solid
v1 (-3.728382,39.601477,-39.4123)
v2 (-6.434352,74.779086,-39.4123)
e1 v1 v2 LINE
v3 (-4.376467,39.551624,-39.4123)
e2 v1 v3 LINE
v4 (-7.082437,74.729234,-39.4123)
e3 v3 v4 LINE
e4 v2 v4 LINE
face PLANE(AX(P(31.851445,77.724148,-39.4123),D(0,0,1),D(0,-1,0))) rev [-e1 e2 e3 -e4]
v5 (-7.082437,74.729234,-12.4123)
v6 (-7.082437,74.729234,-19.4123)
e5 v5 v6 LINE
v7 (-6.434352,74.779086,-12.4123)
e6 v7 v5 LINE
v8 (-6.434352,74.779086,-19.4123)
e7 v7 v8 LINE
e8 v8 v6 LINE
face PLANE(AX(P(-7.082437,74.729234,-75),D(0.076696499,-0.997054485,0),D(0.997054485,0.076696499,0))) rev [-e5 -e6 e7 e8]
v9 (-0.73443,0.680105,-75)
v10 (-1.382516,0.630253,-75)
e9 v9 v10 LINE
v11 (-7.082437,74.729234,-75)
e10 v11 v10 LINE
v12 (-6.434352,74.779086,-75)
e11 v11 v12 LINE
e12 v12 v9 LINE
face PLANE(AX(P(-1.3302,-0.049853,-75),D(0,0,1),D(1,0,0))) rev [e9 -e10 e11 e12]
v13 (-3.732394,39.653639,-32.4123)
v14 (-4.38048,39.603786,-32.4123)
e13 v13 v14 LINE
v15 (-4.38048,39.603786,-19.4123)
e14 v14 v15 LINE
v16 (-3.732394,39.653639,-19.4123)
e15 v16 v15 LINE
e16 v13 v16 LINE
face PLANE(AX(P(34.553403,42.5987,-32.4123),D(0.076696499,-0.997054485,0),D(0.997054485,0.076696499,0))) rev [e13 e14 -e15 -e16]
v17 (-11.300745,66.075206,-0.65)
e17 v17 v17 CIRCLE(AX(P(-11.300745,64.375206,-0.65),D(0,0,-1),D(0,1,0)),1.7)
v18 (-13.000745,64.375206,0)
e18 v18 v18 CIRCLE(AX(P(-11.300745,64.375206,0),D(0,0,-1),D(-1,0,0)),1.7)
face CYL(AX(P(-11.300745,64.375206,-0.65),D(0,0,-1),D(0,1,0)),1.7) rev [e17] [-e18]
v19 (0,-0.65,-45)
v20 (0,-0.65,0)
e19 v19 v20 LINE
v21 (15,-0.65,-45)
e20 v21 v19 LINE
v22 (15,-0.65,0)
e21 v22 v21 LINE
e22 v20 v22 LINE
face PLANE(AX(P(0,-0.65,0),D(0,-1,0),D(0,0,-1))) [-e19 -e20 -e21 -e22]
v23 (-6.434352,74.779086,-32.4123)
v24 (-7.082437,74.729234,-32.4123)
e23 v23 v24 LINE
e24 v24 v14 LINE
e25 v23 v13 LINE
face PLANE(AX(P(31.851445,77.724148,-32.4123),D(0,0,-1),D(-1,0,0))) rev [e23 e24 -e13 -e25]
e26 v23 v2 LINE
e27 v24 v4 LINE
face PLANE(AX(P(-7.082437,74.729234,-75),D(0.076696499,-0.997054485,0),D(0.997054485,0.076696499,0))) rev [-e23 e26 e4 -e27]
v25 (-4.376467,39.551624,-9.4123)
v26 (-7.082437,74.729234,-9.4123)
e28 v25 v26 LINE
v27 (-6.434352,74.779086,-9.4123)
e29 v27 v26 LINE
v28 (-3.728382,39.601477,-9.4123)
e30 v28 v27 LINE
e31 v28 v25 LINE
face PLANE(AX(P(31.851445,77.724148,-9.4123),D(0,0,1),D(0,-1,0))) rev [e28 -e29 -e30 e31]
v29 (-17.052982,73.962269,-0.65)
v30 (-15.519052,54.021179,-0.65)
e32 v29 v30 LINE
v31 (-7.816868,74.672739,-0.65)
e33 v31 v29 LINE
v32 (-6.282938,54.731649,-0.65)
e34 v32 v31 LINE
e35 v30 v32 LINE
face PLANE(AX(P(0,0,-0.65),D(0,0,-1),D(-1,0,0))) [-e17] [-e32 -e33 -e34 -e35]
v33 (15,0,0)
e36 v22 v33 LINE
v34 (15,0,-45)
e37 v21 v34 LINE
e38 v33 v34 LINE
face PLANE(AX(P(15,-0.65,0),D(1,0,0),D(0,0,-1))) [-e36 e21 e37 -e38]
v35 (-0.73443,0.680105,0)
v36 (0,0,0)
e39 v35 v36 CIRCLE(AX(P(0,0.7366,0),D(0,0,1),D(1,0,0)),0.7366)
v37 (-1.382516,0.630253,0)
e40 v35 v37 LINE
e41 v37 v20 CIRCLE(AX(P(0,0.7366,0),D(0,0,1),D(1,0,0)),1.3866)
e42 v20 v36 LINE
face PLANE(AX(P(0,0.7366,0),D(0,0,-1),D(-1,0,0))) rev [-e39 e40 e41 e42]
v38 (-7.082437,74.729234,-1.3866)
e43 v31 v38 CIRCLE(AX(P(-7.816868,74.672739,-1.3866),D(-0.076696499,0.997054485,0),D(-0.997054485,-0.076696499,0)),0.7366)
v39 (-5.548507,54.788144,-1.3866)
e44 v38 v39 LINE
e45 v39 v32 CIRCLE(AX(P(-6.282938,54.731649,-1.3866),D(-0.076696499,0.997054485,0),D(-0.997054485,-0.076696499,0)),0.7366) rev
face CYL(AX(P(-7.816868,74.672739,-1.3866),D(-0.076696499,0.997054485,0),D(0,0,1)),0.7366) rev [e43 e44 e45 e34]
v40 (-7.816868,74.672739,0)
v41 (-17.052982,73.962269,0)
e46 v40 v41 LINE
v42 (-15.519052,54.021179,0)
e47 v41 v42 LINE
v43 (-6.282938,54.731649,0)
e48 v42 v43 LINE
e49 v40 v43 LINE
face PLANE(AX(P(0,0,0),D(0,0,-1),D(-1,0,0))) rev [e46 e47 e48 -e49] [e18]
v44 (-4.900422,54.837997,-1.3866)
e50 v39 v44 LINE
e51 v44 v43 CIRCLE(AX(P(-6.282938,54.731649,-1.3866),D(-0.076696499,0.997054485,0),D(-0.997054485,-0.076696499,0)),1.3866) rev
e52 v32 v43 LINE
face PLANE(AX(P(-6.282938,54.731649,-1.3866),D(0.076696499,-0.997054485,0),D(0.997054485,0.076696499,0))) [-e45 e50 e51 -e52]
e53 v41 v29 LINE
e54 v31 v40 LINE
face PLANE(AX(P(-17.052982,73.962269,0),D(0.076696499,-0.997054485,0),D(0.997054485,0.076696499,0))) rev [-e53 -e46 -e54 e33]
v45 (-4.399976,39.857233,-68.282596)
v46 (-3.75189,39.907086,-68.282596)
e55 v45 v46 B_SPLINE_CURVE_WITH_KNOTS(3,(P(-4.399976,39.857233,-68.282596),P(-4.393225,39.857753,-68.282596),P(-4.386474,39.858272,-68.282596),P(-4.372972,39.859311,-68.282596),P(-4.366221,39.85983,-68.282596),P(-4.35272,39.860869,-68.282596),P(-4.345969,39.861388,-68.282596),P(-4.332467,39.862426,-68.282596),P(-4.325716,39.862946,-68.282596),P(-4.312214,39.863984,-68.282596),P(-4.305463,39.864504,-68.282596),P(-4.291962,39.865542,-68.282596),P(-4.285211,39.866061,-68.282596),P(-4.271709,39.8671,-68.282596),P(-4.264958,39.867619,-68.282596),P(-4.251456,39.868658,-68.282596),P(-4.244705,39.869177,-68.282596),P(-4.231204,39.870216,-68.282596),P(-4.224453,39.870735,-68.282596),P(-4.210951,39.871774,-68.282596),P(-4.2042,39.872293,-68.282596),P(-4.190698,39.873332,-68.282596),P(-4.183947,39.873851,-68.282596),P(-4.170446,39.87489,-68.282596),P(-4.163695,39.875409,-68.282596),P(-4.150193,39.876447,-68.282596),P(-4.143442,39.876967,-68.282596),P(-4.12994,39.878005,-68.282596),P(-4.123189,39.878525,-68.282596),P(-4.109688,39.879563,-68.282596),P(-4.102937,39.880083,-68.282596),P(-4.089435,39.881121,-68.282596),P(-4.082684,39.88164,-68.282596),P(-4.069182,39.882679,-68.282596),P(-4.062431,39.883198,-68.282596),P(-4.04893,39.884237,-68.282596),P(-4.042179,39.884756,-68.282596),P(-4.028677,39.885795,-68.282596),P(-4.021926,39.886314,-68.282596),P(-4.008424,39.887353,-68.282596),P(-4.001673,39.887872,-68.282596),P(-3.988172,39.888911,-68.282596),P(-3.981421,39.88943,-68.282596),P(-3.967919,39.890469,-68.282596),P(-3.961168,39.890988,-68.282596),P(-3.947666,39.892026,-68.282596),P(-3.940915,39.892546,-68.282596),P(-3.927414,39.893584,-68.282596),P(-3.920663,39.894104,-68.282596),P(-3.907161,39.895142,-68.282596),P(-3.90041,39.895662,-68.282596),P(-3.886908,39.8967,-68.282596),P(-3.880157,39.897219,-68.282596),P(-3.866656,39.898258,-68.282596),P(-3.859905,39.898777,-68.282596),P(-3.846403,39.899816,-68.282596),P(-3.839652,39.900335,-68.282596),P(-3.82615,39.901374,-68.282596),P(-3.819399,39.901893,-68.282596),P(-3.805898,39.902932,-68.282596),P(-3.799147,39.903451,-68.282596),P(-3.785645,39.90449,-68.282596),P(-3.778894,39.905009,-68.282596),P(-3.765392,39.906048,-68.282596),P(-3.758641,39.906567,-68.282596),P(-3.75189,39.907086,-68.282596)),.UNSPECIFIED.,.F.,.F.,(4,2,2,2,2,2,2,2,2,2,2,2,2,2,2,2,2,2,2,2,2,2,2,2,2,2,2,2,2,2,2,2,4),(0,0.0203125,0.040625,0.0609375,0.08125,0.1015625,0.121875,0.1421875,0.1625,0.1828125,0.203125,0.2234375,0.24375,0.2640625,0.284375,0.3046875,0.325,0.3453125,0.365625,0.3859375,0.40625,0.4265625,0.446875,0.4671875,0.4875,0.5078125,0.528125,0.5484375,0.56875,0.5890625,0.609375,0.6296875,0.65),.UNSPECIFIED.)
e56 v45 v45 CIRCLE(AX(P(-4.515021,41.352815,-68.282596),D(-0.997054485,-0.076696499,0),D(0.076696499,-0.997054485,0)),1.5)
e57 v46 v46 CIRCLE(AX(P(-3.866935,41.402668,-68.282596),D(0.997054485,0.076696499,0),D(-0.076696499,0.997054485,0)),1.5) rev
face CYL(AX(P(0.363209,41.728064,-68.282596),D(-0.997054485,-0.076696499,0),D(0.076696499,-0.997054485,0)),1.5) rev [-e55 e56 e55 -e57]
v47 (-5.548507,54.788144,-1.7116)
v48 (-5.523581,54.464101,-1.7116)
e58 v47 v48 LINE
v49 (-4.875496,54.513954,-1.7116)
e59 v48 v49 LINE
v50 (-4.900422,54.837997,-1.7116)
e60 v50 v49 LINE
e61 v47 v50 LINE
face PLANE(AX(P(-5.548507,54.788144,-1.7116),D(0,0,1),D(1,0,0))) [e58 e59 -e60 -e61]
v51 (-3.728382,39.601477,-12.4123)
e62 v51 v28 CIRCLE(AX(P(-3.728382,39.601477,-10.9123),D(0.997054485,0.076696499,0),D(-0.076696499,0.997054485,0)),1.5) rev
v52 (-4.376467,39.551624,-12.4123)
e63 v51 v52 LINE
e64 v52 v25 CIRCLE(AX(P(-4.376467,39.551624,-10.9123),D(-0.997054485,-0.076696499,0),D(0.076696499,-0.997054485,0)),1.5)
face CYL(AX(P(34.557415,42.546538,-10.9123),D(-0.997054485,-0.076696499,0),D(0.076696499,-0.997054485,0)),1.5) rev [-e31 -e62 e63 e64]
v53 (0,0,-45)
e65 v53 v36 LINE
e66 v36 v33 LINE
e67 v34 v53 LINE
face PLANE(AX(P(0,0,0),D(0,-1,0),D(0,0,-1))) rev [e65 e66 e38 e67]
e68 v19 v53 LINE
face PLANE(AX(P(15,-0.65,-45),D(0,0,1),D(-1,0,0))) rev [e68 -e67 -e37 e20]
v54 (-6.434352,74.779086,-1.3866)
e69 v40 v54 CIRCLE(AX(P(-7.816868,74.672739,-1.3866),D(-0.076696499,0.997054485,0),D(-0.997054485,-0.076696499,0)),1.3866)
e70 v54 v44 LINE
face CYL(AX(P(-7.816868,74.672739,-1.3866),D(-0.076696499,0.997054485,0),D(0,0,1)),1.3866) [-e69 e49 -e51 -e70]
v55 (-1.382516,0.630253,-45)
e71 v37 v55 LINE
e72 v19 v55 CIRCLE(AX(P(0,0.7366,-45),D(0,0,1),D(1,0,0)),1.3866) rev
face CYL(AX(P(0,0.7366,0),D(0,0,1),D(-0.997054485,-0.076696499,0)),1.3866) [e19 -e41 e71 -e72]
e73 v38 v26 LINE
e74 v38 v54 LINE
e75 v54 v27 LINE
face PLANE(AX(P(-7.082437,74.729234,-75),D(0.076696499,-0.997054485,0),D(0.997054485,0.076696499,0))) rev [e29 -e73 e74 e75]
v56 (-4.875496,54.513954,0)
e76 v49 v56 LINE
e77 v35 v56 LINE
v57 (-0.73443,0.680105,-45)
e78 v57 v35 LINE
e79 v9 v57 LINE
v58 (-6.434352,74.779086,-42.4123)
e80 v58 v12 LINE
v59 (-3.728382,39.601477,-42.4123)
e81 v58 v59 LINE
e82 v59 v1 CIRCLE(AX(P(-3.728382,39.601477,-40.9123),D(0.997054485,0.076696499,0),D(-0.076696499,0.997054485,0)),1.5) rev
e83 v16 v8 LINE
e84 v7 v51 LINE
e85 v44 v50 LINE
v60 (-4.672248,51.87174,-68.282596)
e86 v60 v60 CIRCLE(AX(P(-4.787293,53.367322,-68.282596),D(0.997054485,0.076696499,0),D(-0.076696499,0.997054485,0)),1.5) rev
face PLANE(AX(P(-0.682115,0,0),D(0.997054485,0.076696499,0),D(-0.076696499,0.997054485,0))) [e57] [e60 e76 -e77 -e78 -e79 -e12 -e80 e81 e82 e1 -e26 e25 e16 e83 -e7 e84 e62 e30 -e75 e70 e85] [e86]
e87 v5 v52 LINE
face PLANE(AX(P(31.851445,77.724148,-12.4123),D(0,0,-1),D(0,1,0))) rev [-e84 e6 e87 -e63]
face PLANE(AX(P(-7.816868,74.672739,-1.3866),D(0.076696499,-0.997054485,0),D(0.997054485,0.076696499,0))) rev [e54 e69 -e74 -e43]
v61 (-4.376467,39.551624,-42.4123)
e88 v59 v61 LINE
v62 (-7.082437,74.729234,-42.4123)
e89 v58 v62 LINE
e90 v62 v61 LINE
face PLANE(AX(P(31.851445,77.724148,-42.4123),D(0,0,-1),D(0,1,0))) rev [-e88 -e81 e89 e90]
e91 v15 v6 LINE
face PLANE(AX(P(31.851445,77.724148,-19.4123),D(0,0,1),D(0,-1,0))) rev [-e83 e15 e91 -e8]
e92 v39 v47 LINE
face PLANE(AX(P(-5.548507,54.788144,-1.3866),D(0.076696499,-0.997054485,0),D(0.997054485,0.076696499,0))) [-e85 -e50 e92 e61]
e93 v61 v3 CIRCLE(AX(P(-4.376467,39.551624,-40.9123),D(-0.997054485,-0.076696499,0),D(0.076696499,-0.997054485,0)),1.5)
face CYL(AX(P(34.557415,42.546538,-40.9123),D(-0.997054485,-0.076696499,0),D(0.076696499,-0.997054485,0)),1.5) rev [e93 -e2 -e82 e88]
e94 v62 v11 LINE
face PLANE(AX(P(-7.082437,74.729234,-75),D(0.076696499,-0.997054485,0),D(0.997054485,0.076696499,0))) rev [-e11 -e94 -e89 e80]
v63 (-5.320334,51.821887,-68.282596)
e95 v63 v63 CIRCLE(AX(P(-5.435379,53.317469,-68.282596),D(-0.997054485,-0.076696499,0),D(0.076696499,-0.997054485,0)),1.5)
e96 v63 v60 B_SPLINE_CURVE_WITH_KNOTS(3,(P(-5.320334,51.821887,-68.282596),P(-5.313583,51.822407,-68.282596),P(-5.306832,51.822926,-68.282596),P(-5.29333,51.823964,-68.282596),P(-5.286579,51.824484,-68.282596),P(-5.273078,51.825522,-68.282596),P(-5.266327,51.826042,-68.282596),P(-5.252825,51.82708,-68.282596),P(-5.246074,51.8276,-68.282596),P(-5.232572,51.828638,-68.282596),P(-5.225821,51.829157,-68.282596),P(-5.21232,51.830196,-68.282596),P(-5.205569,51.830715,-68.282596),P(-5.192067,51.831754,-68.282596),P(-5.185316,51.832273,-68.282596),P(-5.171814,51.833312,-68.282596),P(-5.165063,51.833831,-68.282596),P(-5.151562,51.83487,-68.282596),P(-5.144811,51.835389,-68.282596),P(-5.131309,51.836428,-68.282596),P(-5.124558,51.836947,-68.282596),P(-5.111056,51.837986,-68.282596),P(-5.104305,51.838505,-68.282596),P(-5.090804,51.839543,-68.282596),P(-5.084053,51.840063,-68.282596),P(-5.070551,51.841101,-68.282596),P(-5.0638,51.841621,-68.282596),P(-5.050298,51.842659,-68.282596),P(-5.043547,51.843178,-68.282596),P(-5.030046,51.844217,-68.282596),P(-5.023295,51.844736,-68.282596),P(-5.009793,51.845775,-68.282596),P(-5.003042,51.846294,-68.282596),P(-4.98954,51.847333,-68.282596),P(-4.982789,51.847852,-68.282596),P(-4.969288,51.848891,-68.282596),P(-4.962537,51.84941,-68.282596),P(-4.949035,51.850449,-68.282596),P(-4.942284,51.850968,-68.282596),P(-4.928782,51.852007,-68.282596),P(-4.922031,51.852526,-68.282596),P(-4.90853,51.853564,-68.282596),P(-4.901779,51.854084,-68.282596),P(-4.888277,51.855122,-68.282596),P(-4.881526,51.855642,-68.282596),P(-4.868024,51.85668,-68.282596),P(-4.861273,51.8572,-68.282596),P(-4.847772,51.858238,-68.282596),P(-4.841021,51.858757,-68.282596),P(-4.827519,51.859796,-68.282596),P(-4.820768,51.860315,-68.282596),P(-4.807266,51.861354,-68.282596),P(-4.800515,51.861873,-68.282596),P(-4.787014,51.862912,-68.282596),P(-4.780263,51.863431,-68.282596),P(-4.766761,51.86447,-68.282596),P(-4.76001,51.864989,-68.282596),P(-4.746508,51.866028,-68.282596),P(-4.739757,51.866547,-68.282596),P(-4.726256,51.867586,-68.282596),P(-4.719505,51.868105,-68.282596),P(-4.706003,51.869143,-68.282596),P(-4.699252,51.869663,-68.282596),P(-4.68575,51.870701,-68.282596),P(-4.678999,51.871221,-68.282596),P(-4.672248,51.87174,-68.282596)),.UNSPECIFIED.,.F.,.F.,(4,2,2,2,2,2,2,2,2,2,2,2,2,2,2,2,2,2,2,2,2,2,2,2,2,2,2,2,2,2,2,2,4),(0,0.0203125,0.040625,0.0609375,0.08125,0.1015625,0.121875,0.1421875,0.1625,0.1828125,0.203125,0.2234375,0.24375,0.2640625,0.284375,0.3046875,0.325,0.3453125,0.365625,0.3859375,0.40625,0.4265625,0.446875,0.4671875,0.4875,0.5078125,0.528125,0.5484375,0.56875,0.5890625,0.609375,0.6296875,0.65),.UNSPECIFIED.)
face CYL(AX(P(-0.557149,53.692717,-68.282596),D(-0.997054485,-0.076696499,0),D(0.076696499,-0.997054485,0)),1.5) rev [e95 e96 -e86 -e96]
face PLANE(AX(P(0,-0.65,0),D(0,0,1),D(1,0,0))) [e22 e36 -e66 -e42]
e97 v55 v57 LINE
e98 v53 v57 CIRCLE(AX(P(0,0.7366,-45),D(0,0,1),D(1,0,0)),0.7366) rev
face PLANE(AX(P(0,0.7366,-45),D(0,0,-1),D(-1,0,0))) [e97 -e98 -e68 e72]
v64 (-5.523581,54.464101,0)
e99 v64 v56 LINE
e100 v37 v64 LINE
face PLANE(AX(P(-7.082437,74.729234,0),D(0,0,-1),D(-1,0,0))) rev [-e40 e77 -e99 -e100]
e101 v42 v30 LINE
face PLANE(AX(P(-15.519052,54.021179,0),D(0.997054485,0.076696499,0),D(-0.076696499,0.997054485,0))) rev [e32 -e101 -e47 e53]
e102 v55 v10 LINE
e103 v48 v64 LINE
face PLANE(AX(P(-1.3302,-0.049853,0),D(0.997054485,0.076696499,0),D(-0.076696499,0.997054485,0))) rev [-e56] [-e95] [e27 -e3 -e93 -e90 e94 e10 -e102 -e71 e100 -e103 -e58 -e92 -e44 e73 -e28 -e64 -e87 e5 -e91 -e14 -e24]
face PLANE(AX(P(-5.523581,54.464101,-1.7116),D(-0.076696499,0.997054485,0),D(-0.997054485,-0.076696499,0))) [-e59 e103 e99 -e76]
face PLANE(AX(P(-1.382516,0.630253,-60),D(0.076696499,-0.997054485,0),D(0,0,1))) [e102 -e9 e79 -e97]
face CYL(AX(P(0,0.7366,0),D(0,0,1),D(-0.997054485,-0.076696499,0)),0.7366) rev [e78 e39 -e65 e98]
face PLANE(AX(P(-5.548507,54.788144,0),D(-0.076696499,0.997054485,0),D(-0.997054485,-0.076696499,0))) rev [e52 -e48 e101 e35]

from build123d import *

# Parameters (mm, degrees)
VERTICAL_WALL_DEPTH           = 0.65
SMALL_END_ARM_DEPTH           = 75
SKETCH10_W                    = 13
SKETCH10_H                    = 35.229215797
SMALL_END_SLOTS_DEPTH         = 0.65
EDGE_FLANGE4_STRIP_W          = 4.0732
EDGE_FLANGE4_STRIP_H          = 0.65
EDGE_FLANGE4_STRIP_CUT_DEPTH  = 20
EDGE_FLANGE4_RELIEF_W         = 4.3982
EDGE_FLANGE4_RELIEF_H         = 0.325
EDGE_FLANGE4_RELIEF_CUT_DEPTH = 0.65
EDGE_FLANGE4_DEPTH            = 20
SKETCH28_R                    = 1.5
GUARD_MOUNTING_HOLES_2_DEPTH  = 0.65
CUT_EXTRUDE1_START            = -80
CUT_EXTRUDE1_DEPTH            = 35
M3_CLEARANCE_HOLE1_D          = 3.4
M3_CLEARANCE_HOLE1_DEPTH      = 10
M3_CLEARANCE_HOLE1_TIP        = 1.021463052


# Read off the part's stored shape, not the designer's step: Cut-Extrude1
# Sheet-metal steps are written as plain solids
with BuildPart() as part:
    # Sketch1 → Vertical Wall (new body)
    with BuildSketch(Plane(origin=(0, 0, 0), x_dir=(1, 0, 0), z_dir=(0, 1, 0))):
        Polygon((0, 0), (15, 0), (15, 80), (0.01, 75.000714286), (0, 75), align=None)
    extrude(amount=-VERTICAL_WALL_DEPTH)

    # Small End Arm section (across the edge) → Small End Arm (add)
    with BuildSketch(Plane(origin=(-0.682114537, 0, -75), x_dir=(0.9970544854948823, 0.07669649897182769, 0), z_dir=(0, 0, 1))):
        with BuildLine():
            Line((-0.65, 0.682114537), (-0.65, 75))
            Line((-0.65, 75), (0, 75))
            Line((0, 75), (0, 0.682114537))
            ThreePointArc((0, 0.682114537), (0.196140236, 0.181631966), (0.680105359, -0.052315797))
            Line((0.680105359, -0.052315797), (0.630252635, -0.700401212))
            ThreePointArc((0.630252635, -0.700401212), (-0.280779186, -0.26001027), (-0.65, 0.682114537))
        make_face()
    extrude(amount=SMALL_END_ARM_DEPTH)

    # Sketch10 → Small End Slots (cut)
    with BuildSketch(Plane(origin=(-1.326187514, -0.102014424, 0), x_dir=(0, 0, 1), z_dir=(-0.9970544854948824, -0.07669649897182769, 0))):
        with Locations((-25.9123, 57.437707899)):
            Rectangle(SKETCH10_W, SKETCH10_H)
        with BuildLine():
            Line((-39.4123, 75.052315797), (-39.4123, 39.770784203))
            ThreePointArc((-39.4123, 39.770784203), (-40.9123, 38.270784203), (-42.4123, 39.770784203))
            Line((-42.4123, 39.770784203), (-42.4123, 75.052315797))
            ThreePointArc((-42.4123, 75.052315797), (-40.9123, 76.552315797), (-39.4123, 75.052315797))
        make_face()
        with BuildLine():
            Line((-9.4123, 75.052315797), (-9.4123, 39.770784203))
            ThreePointArc((-9.4123, 39.770784203), (-10.9123, 38.270784203), (-12.4123, 39.770784203))
            Line((-12.4123, 39.770784203), (-12.4123, 75.052315797))
            ThreePointArc((-12.4123, 75.052315797), (-10.9123, 76.552315797), (-9.4123, 75.052315797))
        make_face()
    extrude(amount=-SMALL_END_SLOTS_DEPTH, mode=Mode.SUBTRACT)

    # Edge-Flange4 strip (across the edge) → Edge-Flange4 strip cut (cut)
    with BuildSketch(Plane(origin=(-5.548507396, 54.788143978, 0), x_dir=(0, 0, -1), z_dir=(-0.0766964989718277, 0.9970544854948823, 0))):
        with Locations((-0.65, -0.325)):
            Rectangle(EDGE_FLANGE4_STRIP_W, EDGE_FLANGE4_STRIP_H)
    extrude(amount=EDGE_FLANGE4_STRIP_CUT_DEPTH, mode=Mode.SUBTRACT)

    # Edge-Flange4 relief (on the sheet) → Edge-Flange4 relief cut (cut)
    with BuildSketch(Plane(origin=(-5.548507396, 54.788143978, -1.3866), x_dir=(0, 0, -1), z_dir=(-0.9970544854948823, -0.0766964989718277, 6.982374222178593e-15))):
        with Locations((-1.8741, 0.1625)):
            Rectangle(EDGE_FLANGE4_RELIEF_W, EDGE_FLANGE4_RELIEF_H)
    extrude(amount=-EDGE_FLANGE4_RELIEF_CUT_DEPTH, mode=Mode.SUBTRACT)

    # Edge-Flange4 section (across the edge) → Edge-Flange4 (add)
    with BuildSketch(Plane(origin=(-5.548507396, 54.788143978, 0), x_dir=(0, 0, -1), z_dir=(-0.0766964989718277, 0.9970544854948823, 0))):
        with BuildLine():
            Line((0, 0.7366), (0, 10))
            Line((0, 10), (0.65, 10))
            Line((0.65, 10), (0.65, 0.7366))
            ThreePointArc((0.65, 0.7366), (0.865745145, 0.215745145), (1.3866, 0))
            Line((1.3866, 0), (1.3866, -0.65))
            ThreePointArc((1.3866, -0.65), (0.406125737, -0.243874263), (0, 0.7366))
        make_face()
    extrude(amount=EDGE_FLANGE4_DEPTH)

    # Sketch28 → Guard Mounting Holes 2 (cut)
    with BuildSketch(Plane(origin=(-1.326187514, -0.102014424, 0), x_dir=(0, 0, 1), z_dir=(-0.9970544854948823, -0.07669649897182768, 0))):
        with Locations(Location((-68.282596145, 53.577296087, 0), (0, 0, 270))):
            Circle(SKETCH28_R)
        with Locations(Location((-68.282596145, 41.577296087, 0), (0, 0, 270))):
            Circle(SKETCH28_R)
    extrude(amount=-GUARD_MOUNTING_HOLES_2_DEPTH, mode=Mode.SUBTRACT)

    # Cut-Extrude1 outline → Cut-Extrude1 (cut)
    with BuildSketch(Plane.XY.offset(CUT_EXTRUDE1_START)):
        with BuildLine():
            Line((-0.734430334, 0.680105359), (-1.38251575, 0.630252635))
            ThreePointArc((-1.38251575, 0.630252635), (-0.942124807, -0.280779186), (0, -0.65))
            Line((0, -0.65), (15, -0.65))
            Line((15, -0.65), (15, 0))
            Line((15, 0), (0, 0))
            ThreePointArc((0, 0), (-0.500482571, 0.196140236), (-0.734430334, 0.680105359))
        make_face()
    extrude(amount=CUT_EXTRUDE1_DEPTH, mode=Mode.SUBTRACT)

    # M3 Clearance Hole1
    with Locations(Plane(origin=(0, 0, -0.65), x_dir=(-1, 0, 0), z_dir=(0, 0, -1))):
        with Locations((11.300744813, 64.375206338)):
            Hole(M3_CLEARANCE_HOLE1_D / 2, depth=M3_CLEARANCE_HOLE1_DEPTH)
            with Locations((0, 0, -(M3_CLEARANCE_HOLE1_DEPTH + M3_CLEARANCE_HOLE1_TIP / 2))):  # 118° drill point
                Cone(0, M3_CLEARANCE_HOLE1_D / 2, M3_CLEARANCE_HOLE1_TIP, mode=Mode.SUBTRACT)


solid = part.part
